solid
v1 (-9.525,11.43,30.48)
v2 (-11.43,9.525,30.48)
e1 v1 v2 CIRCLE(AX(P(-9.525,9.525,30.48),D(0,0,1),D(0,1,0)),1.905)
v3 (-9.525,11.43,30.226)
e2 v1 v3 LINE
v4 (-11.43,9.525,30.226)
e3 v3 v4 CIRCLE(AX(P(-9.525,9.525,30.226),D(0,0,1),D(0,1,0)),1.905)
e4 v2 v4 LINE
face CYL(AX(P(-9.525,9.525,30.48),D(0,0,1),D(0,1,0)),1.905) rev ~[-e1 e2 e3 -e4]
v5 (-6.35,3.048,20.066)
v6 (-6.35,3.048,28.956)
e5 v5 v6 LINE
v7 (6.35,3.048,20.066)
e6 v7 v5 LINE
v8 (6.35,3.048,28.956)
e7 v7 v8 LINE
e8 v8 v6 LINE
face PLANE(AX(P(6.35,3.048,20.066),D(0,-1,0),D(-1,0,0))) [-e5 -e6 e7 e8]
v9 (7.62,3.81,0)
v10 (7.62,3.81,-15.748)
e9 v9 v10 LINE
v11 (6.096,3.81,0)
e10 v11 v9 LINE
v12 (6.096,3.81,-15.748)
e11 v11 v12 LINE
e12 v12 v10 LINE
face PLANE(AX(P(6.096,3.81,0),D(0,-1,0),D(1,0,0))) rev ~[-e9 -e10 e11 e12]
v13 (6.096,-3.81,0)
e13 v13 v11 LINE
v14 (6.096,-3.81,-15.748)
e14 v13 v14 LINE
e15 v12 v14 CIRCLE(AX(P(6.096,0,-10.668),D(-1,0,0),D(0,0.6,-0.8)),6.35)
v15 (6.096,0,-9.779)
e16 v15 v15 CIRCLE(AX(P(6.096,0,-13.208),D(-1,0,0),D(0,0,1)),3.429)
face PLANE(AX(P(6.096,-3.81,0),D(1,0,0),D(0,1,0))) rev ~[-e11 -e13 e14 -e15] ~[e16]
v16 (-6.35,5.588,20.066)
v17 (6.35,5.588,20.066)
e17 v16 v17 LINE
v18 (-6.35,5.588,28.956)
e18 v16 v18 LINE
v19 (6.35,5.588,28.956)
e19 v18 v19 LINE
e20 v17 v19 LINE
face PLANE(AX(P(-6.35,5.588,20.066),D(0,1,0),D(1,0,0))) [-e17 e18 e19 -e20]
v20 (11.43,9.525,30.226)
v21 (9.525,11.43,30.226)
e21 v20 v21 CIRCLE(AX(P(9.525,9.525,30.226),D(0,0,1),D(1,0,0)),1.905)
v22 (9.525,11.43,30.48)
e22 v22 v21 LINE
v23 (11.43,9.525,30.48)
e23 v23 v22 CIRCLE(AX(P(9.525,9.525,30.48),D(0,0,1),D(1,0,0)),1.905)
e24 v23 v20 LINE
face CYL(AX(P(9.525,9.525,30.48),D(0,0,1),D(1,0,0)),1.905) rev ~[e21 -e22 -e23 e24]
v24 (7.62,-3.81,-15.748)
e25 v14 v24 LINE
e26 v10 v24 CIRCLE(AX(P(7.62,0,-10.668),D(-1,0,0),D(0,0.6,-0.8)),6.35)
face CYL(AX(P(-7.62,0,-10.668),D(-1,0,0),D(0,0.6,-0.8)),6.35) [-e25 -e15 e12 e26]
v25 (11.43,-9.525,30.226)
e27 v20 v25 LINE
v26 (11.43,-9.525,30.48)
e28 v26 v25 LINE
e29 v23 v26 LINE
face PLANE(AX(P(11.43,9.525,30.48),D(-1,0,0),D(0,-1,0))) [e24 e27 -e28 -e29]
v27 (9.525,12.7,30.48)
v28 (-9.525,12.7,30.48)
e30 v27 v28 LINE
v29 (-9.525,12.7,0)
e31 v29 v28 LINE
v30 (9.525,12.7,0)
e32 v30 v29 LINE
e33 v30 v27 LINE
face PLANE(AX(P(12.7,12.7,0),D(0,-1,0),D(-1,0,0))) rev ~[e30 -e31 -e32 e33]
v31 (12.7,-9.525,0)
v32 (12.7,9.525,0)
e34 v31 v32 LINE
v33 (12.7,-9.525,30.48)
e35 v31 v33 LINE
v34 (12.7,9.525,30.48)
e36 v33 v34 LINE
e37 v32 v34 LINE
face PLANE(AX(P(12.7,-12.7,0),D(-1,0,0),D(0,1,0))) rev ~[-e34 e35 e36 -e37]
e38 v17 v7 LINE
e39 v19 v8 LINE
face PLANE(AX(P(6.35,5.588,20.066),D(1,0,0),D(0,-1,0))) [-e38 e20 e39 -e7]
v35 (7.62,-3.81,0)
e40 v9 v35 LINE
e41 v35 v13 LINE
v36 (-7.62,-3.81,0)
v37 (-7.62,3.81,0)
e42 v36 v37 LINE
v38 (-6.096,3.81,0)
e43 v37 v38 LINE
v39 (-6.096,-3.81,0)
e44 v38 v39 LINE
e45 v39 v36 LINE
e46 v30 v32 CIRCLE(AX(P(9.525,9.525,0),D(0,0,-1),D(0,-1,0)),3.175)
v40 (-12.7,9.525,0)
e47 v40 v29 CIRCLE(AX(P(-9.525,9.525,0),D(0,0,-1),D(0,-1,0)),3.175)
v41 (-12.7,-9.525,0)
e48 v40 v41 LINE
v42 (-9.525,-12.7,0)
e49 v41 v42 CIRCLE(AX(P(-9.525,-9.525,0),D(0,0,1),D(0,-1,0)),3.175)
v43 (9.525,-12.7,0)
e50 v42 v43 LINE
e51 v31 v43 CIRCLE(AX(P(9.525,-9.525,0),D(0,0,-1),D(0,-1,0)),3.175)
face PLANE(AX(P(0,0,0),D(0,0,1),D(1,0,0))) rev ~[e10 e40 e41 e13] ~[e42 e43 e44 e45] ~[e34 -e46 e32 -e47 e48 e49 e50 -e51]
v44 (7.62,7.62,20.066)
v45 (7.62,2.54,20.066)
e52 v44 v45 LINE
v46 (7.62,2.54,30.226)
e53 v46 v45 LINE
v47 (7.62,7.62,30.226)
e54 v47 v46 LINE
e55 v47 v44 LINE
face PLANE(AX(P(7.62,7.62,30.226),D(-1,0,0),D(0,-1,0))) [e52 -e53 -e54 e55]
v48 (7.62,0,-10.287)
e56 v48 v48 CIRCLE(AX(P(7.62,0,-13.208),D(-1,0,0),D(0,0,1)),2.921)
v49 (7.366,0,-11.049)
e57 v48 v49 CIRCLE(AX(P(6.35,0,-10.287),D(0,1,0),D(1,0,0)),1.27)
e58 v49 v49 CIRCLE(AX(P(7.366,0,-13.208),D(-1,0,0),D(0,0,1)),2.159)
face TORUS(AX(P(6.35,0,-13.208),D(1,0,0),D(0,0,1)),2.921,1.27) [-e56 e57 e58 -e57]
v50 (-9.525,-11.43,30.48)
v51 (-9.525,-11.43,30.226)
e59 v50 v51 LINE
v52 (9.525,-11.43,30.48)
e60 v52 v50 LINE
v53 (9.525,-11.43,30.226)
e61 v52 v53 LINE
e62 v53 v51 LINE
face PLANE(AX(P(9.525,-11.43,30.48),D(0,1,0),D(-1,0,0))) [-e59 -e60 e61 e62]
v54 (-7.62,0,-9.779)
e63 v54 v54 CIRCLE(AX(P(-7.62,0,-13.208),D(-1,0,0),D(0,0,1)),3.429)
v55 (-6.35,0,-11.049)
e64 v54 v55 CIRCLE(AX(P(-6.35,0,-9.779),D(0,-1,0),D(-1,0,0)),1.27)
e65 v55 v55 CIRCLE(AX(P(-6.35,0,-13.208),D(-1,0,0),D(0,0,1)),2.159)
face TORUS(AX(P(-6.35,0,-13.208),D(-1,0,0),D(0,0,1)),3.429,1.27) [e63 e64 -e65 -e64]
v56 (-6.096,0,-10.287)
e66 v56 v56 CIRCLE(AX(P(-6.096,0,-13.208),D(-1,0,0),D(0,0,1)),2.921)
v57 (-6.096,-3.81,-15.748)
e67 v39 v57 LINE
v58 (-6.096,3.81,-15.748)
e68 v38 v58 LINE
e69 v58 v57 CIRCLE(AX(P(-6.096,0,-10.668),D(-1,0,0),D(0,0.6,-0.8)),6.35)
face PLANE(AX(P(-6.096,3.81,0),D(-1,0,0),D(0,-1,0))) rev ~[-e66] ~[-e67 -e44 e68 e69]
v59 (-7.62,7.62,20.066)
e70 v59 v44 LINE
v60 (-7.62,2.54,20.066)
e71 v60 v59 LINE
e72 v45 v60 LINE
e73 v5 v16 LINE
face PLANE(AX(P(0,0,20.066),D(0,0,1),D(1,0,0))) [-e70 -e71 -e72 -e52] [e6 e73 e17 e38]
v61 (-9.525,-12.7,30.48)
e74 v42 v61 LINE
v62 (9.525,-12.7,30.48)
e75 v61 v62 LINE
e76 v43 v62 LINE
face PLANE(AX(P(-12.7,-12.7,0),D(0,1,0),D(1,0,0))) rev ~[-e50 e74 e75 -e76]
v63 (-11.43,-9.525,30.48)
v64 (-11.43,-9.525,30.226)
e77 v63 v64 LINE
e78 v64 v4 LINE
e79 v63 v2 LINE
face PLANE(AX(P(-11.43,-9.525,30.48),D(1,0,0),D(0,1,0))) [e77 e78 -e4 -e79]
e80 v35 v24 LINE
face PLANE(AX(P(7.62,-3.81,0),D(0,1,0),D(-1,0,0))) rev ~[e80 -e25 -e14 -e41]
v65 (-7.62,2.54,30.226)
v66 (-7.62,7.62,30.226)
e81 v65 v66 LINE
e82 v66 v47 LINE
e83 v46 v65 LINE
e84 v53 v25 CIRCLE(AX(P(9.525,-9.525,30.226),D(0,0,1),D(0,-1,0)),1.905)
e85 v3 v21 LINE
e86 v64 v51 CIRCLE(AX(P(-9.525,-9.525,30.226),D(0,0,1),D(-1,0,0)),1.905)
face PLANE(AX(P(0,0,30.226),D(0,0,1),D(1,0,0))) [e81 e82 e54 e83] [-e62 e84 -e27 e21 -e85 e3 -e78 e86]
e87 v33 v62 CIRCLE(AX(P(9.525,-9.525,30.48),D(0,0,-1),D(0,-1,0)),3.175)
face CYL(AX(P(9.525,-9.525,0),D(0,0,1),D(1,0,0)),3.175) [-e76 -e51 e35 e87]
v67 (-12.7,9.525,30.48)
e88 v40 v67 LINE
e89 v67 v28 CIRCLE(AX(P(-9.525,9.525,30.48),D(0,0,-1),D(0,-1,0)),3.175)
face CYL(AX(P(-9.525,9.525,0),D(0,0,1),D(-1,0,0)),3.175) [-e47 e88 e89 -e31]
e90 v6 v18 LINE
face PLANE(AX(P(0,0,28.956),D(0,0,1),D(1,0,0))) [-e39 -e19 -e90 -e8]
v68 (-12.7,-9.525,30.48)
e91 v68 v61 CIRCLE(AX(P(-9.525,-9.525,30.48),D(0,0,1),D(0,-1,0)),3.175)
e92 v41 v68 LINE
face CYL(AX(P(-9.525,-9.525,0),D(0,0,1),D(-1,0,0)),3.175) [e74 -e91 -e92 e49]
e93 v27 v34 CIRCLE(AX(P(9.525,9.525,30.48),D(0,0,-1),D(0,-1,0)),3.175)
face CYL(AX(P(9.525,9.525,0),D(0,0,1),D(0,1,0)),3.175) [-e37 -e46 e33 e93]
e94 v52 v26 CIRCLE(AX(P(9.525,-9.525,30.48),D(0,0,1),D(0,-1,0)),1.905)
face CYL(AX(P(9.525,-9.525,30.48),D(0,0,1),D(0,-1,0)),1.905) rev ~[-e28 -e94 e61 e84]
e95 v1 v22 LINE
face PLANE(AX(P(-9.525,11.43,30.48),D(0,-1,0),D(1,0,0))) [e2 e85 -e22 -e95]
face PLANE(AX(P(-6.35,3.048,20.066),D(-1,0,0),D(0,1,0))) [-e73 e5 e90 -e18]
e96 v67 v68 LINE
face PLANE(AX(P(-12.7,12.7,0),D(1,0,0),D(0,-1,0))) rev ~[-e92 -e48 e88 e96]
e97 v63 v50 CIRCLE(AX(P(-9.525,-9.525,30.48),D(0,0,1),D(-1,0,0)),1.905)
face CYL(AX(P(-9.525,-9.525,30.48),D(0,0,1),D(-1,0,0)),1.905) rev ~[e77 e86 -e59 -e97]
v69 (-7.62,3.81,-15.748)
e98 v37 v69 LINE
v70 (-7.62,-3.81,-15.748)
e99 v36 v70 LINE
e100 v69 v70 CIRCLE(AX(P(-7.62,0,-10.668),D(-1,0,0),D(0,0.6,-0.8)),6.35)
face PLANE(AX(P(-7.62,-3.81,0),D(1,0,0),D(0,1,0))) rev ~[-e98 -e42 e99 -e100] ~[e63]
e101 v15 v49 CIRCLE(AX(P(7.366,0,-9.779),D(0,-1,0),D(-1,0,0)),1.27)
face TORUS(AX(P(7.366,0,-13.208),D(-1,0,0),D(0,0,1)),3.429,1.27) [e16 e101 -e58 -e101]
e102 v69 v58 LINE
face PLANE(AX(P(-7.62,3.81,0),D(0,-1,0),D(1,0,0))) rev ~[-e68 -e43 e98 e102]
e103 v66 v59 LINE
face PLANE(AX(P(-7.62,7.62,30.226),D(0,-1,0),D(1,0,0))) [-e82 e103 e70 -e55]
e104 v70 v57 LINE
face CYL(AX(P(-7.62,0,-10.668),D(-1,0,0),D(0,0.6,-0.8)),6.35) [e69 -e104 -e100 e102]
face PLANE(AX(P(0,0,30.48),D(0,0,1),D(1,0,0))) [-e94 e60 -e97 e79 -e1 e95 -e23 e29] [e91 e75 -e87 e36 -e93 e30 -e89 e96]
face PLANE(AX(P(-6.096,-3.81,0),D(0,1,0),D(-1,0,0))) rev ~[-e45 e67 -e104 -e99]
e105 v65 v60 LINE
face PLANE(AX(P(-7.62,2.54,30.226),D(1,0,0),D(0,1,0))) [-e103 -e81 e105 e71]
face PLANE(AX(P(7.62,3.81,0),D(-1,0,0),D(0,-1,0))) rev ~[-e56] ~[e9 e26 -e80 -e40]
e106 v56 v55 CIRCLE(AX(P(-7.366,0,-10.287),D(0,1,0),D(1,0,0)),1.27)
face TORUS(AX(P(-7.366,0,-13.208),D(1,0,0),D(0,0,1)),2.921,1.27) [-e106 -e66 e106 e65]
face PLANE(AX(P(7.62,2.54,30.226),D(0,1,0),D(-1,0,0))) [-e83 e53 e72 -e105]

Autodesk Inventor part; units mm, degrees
ref_plane "YZ Plane" through (0, 0, 0) normal (1, 0, 0) x (0, 1, 0)
ref_plane "XZ Plane" through (0, 0, 0) normal (0, 1, 0) x (-1, 0, 0)
ref_plane "XY Plane" through (0, 0, 0) normal (0, 0, 1) x (1, 0, 0)
sketch "Sketch1" plane through (0, 0, 0) normal (0, 0, 1) x (1, 0, 0)
  line L0 (-12.7, -12.7) -> (12.7, -12.7)
  line L1 (12.7, -12.7) -> (12.7, 12.7)
  line L2 (12.7, 12.7) -> (-12.7, 12.7)
  line L3 (-12.7, 12.7) -> (-12.7, -12.7)
  line L4 (-12.7, -12.7) -> (12.7, 12.7) construction
  line L5 (12.7, -12.7) -> (-12.7, 12.7) construction
  point P0 (0, 0)
  dimension "d0" = 25.4
extrude "Extrusion1" add sketch "Sketch1" along normal blind 30.48
fillet "Fillet1" radius 3.175 4 edges at (-12.7, 12.7, 15.24) (-12.7, -12.7, 15.24) (12.7, -12.7, 15.24) (12.7, 12.7, 15.24)
sketch "Sketch2" plane through (0, 0, 30.48) normal (0, 0, 1) x (1, 0, 0)
  arc A0 (12.7, 9.525) -> (9.525, 12.7) centre (9.525, 9.525) ccw projected
  line L0 (9.525, 12.7) -> (-9.525, 12.7) projected
  arc A1 (-9.525, 12.7) -> (-12.7, 9.525) centre (-9.525, 9.525) ccw projected
  line L1 (-12.7, 9.525) -> (-12.7, -9.525) projected
  arc A2 (-12.7, -9.525) -> (-9.525, -12.7) centre (-9.525, -9.525) ccw projected
  line L2 (-9.525, -12.7) -> (9.525, -12.7) projected
  arc A3 (9.525, -12.7) -> (12.7, -9.525) centre (9.525, -9.525) ccw projected
  line L3 (12.7, -9.525) -> (12.7, 9.525) projected
  line L4 (-9.525, 11.43) -> (9.525, 11.43)
  arc A4 (11.43, 9.525) -> (9.525, 11.43) centre (9.525, 9.525) ccw
  line L5 (11.43, 9.525) -> (11.43, -9.525)
  arc A5 (9.525, -11.43) -> (11.43, -9.525) centre (9.525, -9.525) ccw
  line L6 (9.525, -11.43) -> (-9.525, -11.43)
  arc A6 (-11.43, -9.525) -> (-9.525, -11.43) centre (-9.525, -9.525) ccw
  line L7 (-11.43, -9.525) -> (-11.43, 9.525)
  arc A7 (-9.525, 11.43) -> (-11.43, 9.525) centre (-9.525, 9.525) ccw
  point P0 (0, 0)
  dimension "d4" = 1.27
extrude "Extrusion2" cut sketch "Sketch2" against normal blind 0.254 contours L4 A4 L5 A5 L6 A6 L7 A7
sketch "Sketch3" plane through (0, 0, 30.226) normal (0, 0, 1) x (1, 0, 0)
  line L0 (-7.62, 7.62) -> (7.62, 7.62)
  line L1 (7.62, 7.62) -> (7.62, 2.54)
  line L2 (7.62, 2.54) -> (-7.62, 2.54)
  line L3 (-7.62, 2.54) -> (-7.62, 7.62)
  line L4 (-7.62, 7.62) -> (7.62, 2.54) construction
  line L5 (7.62, 7.62) -> (-7.62, 2.54) construction
  line L6 (11.43, 9.525) -> (11.43, -9.525) projected
  line L7 (-11.43, -9.525) -> (-11.43, 9.525) projected
  line L8 (-9.525, 11.43) -> (9.525, 11.43) projected
  point P0 (0, 0)
  point P1 (0, 5.08)
  dimension "d7" = 3.81
  dimension "d8" = 3.81
  dimension "d9" = 3.81
  dimension "d10" = 5.08
extrude "Extrusion3" cut sketch "Sketch3" against normal blind 10.16
sketch "Sketch4" plane through (0, 0, 20.066) normal (0, 0, 1) x (1, 0, 0)
  line L0 (-6.35, 5.588) -> (6.35, 5.588)
  line L1 (6.35, 5.588) -> (6.35, 3.048)
  line L2 (6.35, 3.048) -> (-6.35, 3.048)
  line L3 (-6.35, 3.048) -> (-6.35, 5.588)
  line L4 (-6.35, 5.588) -> (6.35, 3.048) construction
  line L5 (6.35, 5.588) -> (-6.35, 3.048) construction
  line L6 (-7.62, 2.54) -> (-7.62, 7.62) projected
  line L7 (7.62, 7.62) -> (7.62, 2.54) projected
  line L8 (7.62, 2.54) -> (-7.62, 2.54) projected
  point P0 (0, 0)
  point P1 (0, 4.318)
  point P2 (7.62, 5.08)
  dimension "d13" = 1.27
  dimension "d14" = 1.27
  dimension "d15" = 0.508
  dimension "d16" = 2.54
extrude "Extrusion4" add sketch "Sketch4" along normal blind 8.89
sketch "Sketch5" plane through (0, 0, 0) normal (0, 0, -1) x (-1, 0, 0)
  line L0 (0, 0) -> (6.858, 0) construction
  line L1 (0, 0) -> (-6.858, 0) construction
  line L2 (6.096, -3.81) -> (7.62, -3.81)
  line L3 (7.62, -3.81) -> (7.62, 3.81)
  line L4 (7.62, 3.81) -> (6.096, 3.81)
  line L5 (6.096, 3.81) -> (6.096, -3.81)
  line L6 (6.096, -3.81) -> (7.62, 3.81) construction
  line L7 (7.62, -3.81) -> (6.096, 3.81) construction
  line L8 (-7.62, -3.81) -> (-6.096, -3.81)
  line L9 (-6.096, -3.81) -> (-6.096, 3.81)
  line L10 (-6.096, 3.81) -> (-7.62, 3.81)
  line L11 (-7.62, 3.81) -> (-7.62, -3.81)
  line L12 (-7.62, -3.81) -> (-6.096, 3.81) construction
  line L13 (-6.096, -3.81) -> (-7.62, 3.81) construction
  dimension "d19" = 6.858
  dimension "d20" = 7.62
  dimension "d21" = 1.524
extrude "Extrusion5" add sketch "Sketch5" along normal blind 17.78
sketch "Sketch6" plane through (-7.62, -3.81, 0) normal (-1, 0, 0) x (0, 0, 1)
  line L0 (0, 7.62) -> (-17.78, 7.62) projected
  line L1 (0, 0) -> (-17.78, 0) projected
  arc A0 (-15.748, 7.62) -> (-15.748, 0) centre (-10.668, 3.81) ccw
  line L2 (-15.748, 7.62) -> (-17.78, 7.62)
  line L3 (-17.78, 0) -> (-17.78, 7.62) projected
  line L4 (-17.78, 0) -> (-15.748, 0)
  point P0 (0, 3.81)
  dimension "d24" = 2.032
  dimension "d25" = 2.032
  dimension "d26" = 6.35
extrude "Extrusion6" cut sketch "Sketch6" against normal blind 17.78
sketch "Sketch7" plane through (-7.62, -3.81, 0) normal (-1, 0, 0) x (0, 0, 1)
  arc A0 (-15.748, 7.62) -> (-15.748, 0) centre (-10.668, 3.81) ccw construction
  line L0 (-17.018, 3.81) -> (-13.208, 3.81) construction
  circle A1 centre (-13.208, 3.81) radius 2.159
  point P0 (0, 3.81)
  dimension "d29" = 3.81
  dimension "d30" = 4.318
extrude "Extrusion7" cut sketch "Sketch7" against normal blind 17.78
fillet "Fillet2" radius 1.27 4 edges at (-7.62, 0, -15.367) (6.096, 0, -15.367) (-6.096, 0, -15.367) (7.62, 0, -15.367)
properties part number "iPhone Charger"
